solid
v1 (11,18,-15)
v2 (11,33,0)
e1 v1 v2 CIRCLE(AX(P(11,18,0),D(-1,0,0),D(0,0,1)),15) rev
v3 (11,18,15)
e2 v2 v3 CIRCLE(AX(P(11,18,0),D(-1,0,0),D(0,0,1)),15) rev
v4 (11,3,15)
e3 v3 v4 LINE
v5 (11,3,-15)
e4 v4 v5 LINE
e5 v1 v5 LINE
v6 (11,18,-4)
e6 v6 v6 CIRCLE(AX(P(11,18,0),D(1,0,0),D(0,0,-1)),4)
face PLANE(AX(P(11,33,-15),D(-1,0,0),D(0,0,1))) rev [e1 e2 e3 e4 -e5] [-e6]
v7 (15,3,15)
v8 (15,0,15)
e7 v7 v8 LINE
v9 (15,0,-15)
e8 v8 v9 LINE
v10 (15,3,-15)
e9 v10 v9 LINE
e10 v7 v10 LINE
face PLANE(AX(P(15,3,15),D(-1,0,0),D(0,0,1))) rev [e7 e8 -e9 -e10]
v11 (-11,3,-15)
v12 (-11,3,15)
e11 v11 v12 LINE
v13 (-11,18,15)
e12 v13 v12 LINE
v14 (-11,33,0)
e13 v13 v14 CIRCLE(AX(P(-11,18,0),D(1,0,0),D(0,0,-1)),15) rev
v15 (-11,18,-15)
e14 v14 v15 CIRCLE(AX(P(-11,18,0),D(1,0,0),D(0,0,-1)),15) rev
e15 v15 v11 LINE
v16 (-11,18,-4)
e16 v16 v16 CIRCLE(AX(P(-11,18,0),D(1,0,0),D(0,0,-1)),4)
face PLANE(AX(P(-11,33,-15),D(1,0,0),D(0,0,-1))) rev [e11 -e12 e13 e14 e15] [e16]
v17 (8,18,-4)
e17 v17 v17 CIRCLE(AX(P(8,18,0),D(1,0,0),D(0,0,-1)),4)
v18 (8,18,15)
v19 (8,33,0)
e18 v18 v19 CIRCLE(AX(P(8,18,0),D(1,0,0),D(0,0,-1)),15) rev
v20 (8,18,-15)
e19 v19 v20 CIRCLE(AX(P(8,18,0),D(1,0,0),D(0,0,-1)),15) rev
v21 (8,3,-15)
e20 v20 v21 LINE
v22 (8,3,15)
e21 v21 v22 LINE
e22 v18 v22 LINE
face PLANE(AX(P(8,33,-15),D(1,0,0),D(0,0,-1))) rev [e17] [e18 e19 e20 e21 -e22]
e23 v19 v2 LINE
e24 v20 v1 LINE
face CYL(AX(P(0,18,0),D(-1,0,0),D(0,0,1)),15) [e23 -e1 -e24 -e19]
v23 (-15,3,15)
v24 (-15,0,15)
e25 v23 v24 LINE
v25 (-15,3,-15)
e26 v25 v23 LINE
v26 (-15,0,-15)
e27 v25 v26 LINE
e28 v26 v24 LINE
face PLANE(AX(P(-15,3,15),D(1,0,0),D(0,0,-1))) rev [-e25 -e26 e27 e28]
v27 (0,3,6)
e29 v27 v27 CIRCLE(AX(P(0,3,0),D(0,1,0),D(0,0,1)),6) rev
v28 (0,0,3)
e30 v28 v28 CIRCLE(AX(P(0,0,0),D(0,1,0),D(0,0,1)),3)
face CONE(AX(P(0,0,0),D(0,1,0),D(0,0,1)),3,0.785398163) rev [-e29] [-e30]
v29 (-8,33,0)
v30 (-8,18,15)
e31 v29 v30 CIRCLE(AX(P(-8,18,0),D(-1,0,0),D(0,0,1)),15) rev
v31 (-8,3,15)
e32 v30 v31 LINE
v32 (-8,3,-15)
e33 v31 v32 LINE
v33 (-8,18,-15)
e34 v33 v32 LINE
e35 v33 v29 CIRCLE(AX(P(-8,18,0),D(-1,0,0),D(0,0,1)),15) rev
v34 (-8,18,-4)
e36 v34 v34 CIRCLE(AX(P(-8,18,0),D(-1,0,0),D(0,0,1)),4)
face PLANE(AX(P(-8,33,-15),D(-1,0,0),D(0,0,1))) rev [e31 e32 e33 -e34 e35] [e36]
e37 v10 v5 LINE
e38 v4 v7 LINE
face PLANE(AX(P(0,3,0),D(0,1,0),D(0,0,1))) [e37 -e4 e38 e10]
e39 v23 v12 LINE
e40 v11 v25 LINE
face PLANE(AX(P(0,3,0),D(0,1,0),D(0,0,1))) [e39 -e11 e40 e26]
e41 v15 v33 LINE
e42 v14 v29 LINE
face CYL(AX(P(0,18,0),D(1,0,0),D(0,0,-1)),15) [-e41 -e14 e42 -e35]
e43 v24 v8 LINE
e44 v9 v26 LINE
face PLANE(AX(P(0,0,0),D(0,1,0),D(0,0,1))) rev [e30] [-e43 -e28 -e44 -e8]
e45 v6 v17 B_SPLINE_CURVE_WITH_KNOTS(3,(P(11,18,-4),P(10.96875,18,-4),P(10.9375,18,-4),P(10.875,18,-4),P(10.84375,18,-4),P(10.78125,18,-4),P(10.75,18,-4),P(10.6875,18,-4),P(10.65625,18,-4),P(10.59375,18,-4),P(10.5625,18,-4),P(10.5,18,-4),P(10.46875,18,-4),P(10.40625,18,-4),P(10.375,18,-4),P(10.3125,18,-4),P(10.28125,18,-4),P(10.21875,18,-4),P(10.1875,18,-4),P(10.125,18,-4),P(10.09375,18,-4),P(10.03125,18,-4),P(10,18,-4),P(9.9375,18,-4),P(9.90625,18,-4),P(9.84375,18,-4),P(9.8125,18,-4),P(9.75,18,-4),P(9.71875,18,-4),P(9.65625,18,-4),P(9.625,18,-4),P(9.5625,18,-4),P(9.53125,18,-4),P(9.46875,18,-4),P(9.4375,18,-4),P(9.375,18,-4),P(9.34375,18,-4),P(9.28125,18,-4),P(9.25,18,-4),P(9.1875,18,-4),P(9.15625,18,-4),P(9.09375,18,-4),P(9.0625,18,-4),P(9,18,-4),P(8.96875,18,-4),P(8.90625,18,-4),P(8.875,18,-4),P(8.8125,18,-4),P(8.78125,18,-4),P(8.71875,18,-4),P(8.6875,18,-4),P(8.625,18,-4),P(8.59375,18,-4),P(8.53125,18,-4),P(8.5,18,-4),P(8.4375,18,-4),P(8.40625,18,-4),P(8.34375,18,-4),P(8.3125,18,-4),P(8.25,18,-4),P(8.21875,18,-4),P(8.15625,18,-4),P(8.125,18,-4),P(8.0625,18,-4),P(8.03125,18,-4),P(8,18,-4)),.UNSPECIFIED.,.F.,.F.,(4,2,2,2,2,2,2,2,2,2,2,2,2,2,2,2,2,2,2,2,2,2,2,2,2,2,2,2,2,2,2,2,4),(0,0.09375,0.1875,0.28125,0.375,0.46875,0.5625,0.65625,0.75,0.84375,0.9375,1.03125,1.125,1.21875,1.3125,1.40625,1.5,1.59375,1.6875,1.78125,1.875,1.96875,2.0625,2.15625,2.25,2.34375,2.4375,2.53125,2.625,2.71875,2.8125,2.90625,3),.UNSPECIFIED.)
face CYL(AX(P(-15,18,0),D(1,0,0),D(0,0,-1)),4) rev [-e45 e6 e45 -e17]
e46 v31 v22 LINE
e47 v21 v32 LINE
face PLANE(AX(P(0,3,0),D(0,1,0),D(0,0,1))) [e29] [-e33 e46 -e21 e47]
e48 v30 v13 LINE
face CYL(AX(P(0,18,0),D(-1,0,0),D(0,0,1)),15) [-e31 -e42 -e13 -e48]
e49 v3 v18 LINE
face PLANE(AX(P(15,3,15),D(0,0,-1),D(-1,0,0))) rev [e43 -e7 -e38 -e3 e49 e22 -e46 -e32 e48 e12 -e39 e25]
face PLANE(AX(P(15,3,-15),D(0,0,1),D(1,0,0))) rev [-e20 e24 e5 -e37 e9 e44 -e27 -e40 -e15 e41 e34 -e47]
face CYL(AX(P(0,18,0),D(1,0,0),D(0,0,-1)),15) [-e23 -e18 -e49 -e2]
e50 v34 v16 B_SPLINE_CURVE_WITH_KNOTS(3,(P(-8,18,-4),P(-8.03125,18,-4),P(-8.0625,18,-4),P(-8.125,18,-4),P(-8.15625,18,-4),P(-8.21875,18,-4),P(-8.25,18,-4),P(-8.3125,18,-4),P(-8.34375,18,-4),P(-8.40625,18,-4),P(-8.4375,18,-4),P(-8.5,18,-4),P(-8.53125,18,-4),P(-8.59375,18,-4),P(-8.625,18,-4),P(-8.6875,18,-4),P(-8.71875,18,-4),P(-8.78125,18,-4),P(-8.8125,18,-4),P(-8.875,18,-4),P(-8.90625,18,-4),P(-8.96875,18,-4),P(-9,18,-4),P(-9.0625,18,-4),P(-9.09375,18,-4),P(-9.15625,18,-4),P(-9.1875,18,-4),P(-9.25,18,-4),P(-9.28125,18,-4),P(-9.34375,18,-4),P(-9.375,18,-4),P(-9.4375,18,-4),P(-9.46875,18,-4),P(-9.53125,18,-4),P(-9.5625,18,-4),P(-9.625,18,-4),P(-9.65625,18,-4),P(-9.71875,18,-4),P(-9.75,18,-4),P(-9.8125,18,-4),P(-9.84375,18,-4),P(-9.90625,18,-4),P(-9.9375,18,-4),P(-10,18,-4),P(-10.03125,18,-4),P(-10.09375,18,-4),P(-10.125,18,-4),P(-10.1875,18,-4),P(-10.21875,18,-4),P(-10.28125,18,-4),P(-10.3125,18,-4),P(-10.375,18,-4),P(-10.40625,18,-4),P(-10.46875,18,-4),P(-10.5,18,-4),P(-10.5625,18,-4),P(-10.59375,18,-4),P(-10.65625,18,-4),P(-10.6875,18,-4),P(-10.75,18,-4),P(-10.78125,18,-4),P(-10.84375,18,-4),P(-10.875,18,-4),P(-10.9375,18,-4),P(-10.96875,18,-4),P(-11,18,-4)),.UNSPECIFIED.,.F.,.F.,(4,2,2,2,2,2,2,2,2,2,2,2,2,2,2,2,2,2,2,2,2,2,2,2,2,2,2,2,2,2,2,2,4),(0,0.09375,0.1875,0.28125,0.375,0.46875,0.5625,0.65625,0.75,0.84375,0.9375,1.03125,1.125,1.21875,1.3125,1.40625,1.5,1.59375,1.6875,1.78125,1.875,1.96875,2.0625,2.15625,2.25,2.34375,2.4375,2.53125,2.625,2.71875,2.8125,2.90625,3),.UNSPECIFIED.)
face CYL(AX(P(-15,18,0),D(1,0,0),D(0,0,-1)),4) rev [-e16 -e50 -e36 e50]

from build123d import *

# Parameters (mm, degrees)
CROQUIS1_W              = 30
CROQUIS1_H              = 30
SALIENTE_EXTRUIR1_DEPTH = 3
CROQUIS2_W              = 3
CROQUIS2_H              = 30
SALIENTE_EXTRUIR2_DEPTH = 30
REDONDEO1_R             = 15
CROQUIS3_R              = 4
CORTAR_EXTRUIR1_DEPTH   = 45.609416046
CROQUIS4_R              = 3
CORTAR_EXTRUIR2_DEPTH   = 37.742346142
CHAFL_N1_SIZE           = 3


with BuildPart() as part:
    # Croquis1 → Saliente-Extruir1 (new body)
    with BuildSketch(Plane(origin=(0, 0, 0), x_dir=(1, 0, 0), z_dir=(0, 1, 0))):
        Rectangle(CROQUIS1_W, CROQUIS1_H)
    extrude(amount=SALIENTE_EXTRUIR1_DEPTH)

    # Croquis2 → Saliente-Extruir2 (add)
    with BuildSketch(Plane(origin=(0, 3, 0), x_dir=(1, 0, 0), z_dir=(0, 1, 0))):
        with Locations((-9.5, 0)):
            Rectangle(CROQUIS2_W, CROQUIS2_H)
        with Locations((9.5, 0)):
            Rectangle(CROQUIS2_W, CROQUIS2_H)
    extrude(amount=SALIENTE_EXTRUIR2_DEPTH)

    # Redondeo1
    redondeo1_edges = [part.edges().sort_by_distance(p)[0] for p in [
        (-9.5, 33, -15),
        (9.5, 33, -15),
        (9.5, 33, 15),
        (-9.5, 33, 15),
    ]]
    fillet(redondeo1_edges, radius=REDONDEO1_R - 0.0001)  # a hair under: the kernel refuses the full size

    # Croquis3 → Cortar-Extruir1 (cut, through all)
    with BuildSketch(Plane(origin=(11, 0, 0), x_dir=(0, 0, -1), z_dir=(1, 0, 0))):
        with Locations((0, 18)):
            Circle(CROQUIS3_R)
    extrude(amount=-CORTAR_EXTRUIR1_DEPTH, mode=Mode.SUBTRACT)

    # Croquis4 → Cortar-Extruir2 (cut, through all)
    with BuildSketch(Plane(origin=(0, 3, 0), x_dir=(1, 0, 0), z_dir=(0, 1, 0))):
        with Locations(Location((0, 0, 0), (0, 0, 270))):
            Circle(CROQUIS4_R)
    extrude(amount=-CORTAR_EXTRUIR2_DEPTH, mode=Mode.SUBTRACT)

    # Chaflán1
    chafl_n1_edges = [part.edges().sort_by_distance(p)[0] for p in [
        (0, 3, -3),
    ]]
    chamfer(chafl_n1_edges, length=CHAFL_N1_SIZE - 0.0001)  # a hair under: the kernel refuses the full size


solid = part.part
